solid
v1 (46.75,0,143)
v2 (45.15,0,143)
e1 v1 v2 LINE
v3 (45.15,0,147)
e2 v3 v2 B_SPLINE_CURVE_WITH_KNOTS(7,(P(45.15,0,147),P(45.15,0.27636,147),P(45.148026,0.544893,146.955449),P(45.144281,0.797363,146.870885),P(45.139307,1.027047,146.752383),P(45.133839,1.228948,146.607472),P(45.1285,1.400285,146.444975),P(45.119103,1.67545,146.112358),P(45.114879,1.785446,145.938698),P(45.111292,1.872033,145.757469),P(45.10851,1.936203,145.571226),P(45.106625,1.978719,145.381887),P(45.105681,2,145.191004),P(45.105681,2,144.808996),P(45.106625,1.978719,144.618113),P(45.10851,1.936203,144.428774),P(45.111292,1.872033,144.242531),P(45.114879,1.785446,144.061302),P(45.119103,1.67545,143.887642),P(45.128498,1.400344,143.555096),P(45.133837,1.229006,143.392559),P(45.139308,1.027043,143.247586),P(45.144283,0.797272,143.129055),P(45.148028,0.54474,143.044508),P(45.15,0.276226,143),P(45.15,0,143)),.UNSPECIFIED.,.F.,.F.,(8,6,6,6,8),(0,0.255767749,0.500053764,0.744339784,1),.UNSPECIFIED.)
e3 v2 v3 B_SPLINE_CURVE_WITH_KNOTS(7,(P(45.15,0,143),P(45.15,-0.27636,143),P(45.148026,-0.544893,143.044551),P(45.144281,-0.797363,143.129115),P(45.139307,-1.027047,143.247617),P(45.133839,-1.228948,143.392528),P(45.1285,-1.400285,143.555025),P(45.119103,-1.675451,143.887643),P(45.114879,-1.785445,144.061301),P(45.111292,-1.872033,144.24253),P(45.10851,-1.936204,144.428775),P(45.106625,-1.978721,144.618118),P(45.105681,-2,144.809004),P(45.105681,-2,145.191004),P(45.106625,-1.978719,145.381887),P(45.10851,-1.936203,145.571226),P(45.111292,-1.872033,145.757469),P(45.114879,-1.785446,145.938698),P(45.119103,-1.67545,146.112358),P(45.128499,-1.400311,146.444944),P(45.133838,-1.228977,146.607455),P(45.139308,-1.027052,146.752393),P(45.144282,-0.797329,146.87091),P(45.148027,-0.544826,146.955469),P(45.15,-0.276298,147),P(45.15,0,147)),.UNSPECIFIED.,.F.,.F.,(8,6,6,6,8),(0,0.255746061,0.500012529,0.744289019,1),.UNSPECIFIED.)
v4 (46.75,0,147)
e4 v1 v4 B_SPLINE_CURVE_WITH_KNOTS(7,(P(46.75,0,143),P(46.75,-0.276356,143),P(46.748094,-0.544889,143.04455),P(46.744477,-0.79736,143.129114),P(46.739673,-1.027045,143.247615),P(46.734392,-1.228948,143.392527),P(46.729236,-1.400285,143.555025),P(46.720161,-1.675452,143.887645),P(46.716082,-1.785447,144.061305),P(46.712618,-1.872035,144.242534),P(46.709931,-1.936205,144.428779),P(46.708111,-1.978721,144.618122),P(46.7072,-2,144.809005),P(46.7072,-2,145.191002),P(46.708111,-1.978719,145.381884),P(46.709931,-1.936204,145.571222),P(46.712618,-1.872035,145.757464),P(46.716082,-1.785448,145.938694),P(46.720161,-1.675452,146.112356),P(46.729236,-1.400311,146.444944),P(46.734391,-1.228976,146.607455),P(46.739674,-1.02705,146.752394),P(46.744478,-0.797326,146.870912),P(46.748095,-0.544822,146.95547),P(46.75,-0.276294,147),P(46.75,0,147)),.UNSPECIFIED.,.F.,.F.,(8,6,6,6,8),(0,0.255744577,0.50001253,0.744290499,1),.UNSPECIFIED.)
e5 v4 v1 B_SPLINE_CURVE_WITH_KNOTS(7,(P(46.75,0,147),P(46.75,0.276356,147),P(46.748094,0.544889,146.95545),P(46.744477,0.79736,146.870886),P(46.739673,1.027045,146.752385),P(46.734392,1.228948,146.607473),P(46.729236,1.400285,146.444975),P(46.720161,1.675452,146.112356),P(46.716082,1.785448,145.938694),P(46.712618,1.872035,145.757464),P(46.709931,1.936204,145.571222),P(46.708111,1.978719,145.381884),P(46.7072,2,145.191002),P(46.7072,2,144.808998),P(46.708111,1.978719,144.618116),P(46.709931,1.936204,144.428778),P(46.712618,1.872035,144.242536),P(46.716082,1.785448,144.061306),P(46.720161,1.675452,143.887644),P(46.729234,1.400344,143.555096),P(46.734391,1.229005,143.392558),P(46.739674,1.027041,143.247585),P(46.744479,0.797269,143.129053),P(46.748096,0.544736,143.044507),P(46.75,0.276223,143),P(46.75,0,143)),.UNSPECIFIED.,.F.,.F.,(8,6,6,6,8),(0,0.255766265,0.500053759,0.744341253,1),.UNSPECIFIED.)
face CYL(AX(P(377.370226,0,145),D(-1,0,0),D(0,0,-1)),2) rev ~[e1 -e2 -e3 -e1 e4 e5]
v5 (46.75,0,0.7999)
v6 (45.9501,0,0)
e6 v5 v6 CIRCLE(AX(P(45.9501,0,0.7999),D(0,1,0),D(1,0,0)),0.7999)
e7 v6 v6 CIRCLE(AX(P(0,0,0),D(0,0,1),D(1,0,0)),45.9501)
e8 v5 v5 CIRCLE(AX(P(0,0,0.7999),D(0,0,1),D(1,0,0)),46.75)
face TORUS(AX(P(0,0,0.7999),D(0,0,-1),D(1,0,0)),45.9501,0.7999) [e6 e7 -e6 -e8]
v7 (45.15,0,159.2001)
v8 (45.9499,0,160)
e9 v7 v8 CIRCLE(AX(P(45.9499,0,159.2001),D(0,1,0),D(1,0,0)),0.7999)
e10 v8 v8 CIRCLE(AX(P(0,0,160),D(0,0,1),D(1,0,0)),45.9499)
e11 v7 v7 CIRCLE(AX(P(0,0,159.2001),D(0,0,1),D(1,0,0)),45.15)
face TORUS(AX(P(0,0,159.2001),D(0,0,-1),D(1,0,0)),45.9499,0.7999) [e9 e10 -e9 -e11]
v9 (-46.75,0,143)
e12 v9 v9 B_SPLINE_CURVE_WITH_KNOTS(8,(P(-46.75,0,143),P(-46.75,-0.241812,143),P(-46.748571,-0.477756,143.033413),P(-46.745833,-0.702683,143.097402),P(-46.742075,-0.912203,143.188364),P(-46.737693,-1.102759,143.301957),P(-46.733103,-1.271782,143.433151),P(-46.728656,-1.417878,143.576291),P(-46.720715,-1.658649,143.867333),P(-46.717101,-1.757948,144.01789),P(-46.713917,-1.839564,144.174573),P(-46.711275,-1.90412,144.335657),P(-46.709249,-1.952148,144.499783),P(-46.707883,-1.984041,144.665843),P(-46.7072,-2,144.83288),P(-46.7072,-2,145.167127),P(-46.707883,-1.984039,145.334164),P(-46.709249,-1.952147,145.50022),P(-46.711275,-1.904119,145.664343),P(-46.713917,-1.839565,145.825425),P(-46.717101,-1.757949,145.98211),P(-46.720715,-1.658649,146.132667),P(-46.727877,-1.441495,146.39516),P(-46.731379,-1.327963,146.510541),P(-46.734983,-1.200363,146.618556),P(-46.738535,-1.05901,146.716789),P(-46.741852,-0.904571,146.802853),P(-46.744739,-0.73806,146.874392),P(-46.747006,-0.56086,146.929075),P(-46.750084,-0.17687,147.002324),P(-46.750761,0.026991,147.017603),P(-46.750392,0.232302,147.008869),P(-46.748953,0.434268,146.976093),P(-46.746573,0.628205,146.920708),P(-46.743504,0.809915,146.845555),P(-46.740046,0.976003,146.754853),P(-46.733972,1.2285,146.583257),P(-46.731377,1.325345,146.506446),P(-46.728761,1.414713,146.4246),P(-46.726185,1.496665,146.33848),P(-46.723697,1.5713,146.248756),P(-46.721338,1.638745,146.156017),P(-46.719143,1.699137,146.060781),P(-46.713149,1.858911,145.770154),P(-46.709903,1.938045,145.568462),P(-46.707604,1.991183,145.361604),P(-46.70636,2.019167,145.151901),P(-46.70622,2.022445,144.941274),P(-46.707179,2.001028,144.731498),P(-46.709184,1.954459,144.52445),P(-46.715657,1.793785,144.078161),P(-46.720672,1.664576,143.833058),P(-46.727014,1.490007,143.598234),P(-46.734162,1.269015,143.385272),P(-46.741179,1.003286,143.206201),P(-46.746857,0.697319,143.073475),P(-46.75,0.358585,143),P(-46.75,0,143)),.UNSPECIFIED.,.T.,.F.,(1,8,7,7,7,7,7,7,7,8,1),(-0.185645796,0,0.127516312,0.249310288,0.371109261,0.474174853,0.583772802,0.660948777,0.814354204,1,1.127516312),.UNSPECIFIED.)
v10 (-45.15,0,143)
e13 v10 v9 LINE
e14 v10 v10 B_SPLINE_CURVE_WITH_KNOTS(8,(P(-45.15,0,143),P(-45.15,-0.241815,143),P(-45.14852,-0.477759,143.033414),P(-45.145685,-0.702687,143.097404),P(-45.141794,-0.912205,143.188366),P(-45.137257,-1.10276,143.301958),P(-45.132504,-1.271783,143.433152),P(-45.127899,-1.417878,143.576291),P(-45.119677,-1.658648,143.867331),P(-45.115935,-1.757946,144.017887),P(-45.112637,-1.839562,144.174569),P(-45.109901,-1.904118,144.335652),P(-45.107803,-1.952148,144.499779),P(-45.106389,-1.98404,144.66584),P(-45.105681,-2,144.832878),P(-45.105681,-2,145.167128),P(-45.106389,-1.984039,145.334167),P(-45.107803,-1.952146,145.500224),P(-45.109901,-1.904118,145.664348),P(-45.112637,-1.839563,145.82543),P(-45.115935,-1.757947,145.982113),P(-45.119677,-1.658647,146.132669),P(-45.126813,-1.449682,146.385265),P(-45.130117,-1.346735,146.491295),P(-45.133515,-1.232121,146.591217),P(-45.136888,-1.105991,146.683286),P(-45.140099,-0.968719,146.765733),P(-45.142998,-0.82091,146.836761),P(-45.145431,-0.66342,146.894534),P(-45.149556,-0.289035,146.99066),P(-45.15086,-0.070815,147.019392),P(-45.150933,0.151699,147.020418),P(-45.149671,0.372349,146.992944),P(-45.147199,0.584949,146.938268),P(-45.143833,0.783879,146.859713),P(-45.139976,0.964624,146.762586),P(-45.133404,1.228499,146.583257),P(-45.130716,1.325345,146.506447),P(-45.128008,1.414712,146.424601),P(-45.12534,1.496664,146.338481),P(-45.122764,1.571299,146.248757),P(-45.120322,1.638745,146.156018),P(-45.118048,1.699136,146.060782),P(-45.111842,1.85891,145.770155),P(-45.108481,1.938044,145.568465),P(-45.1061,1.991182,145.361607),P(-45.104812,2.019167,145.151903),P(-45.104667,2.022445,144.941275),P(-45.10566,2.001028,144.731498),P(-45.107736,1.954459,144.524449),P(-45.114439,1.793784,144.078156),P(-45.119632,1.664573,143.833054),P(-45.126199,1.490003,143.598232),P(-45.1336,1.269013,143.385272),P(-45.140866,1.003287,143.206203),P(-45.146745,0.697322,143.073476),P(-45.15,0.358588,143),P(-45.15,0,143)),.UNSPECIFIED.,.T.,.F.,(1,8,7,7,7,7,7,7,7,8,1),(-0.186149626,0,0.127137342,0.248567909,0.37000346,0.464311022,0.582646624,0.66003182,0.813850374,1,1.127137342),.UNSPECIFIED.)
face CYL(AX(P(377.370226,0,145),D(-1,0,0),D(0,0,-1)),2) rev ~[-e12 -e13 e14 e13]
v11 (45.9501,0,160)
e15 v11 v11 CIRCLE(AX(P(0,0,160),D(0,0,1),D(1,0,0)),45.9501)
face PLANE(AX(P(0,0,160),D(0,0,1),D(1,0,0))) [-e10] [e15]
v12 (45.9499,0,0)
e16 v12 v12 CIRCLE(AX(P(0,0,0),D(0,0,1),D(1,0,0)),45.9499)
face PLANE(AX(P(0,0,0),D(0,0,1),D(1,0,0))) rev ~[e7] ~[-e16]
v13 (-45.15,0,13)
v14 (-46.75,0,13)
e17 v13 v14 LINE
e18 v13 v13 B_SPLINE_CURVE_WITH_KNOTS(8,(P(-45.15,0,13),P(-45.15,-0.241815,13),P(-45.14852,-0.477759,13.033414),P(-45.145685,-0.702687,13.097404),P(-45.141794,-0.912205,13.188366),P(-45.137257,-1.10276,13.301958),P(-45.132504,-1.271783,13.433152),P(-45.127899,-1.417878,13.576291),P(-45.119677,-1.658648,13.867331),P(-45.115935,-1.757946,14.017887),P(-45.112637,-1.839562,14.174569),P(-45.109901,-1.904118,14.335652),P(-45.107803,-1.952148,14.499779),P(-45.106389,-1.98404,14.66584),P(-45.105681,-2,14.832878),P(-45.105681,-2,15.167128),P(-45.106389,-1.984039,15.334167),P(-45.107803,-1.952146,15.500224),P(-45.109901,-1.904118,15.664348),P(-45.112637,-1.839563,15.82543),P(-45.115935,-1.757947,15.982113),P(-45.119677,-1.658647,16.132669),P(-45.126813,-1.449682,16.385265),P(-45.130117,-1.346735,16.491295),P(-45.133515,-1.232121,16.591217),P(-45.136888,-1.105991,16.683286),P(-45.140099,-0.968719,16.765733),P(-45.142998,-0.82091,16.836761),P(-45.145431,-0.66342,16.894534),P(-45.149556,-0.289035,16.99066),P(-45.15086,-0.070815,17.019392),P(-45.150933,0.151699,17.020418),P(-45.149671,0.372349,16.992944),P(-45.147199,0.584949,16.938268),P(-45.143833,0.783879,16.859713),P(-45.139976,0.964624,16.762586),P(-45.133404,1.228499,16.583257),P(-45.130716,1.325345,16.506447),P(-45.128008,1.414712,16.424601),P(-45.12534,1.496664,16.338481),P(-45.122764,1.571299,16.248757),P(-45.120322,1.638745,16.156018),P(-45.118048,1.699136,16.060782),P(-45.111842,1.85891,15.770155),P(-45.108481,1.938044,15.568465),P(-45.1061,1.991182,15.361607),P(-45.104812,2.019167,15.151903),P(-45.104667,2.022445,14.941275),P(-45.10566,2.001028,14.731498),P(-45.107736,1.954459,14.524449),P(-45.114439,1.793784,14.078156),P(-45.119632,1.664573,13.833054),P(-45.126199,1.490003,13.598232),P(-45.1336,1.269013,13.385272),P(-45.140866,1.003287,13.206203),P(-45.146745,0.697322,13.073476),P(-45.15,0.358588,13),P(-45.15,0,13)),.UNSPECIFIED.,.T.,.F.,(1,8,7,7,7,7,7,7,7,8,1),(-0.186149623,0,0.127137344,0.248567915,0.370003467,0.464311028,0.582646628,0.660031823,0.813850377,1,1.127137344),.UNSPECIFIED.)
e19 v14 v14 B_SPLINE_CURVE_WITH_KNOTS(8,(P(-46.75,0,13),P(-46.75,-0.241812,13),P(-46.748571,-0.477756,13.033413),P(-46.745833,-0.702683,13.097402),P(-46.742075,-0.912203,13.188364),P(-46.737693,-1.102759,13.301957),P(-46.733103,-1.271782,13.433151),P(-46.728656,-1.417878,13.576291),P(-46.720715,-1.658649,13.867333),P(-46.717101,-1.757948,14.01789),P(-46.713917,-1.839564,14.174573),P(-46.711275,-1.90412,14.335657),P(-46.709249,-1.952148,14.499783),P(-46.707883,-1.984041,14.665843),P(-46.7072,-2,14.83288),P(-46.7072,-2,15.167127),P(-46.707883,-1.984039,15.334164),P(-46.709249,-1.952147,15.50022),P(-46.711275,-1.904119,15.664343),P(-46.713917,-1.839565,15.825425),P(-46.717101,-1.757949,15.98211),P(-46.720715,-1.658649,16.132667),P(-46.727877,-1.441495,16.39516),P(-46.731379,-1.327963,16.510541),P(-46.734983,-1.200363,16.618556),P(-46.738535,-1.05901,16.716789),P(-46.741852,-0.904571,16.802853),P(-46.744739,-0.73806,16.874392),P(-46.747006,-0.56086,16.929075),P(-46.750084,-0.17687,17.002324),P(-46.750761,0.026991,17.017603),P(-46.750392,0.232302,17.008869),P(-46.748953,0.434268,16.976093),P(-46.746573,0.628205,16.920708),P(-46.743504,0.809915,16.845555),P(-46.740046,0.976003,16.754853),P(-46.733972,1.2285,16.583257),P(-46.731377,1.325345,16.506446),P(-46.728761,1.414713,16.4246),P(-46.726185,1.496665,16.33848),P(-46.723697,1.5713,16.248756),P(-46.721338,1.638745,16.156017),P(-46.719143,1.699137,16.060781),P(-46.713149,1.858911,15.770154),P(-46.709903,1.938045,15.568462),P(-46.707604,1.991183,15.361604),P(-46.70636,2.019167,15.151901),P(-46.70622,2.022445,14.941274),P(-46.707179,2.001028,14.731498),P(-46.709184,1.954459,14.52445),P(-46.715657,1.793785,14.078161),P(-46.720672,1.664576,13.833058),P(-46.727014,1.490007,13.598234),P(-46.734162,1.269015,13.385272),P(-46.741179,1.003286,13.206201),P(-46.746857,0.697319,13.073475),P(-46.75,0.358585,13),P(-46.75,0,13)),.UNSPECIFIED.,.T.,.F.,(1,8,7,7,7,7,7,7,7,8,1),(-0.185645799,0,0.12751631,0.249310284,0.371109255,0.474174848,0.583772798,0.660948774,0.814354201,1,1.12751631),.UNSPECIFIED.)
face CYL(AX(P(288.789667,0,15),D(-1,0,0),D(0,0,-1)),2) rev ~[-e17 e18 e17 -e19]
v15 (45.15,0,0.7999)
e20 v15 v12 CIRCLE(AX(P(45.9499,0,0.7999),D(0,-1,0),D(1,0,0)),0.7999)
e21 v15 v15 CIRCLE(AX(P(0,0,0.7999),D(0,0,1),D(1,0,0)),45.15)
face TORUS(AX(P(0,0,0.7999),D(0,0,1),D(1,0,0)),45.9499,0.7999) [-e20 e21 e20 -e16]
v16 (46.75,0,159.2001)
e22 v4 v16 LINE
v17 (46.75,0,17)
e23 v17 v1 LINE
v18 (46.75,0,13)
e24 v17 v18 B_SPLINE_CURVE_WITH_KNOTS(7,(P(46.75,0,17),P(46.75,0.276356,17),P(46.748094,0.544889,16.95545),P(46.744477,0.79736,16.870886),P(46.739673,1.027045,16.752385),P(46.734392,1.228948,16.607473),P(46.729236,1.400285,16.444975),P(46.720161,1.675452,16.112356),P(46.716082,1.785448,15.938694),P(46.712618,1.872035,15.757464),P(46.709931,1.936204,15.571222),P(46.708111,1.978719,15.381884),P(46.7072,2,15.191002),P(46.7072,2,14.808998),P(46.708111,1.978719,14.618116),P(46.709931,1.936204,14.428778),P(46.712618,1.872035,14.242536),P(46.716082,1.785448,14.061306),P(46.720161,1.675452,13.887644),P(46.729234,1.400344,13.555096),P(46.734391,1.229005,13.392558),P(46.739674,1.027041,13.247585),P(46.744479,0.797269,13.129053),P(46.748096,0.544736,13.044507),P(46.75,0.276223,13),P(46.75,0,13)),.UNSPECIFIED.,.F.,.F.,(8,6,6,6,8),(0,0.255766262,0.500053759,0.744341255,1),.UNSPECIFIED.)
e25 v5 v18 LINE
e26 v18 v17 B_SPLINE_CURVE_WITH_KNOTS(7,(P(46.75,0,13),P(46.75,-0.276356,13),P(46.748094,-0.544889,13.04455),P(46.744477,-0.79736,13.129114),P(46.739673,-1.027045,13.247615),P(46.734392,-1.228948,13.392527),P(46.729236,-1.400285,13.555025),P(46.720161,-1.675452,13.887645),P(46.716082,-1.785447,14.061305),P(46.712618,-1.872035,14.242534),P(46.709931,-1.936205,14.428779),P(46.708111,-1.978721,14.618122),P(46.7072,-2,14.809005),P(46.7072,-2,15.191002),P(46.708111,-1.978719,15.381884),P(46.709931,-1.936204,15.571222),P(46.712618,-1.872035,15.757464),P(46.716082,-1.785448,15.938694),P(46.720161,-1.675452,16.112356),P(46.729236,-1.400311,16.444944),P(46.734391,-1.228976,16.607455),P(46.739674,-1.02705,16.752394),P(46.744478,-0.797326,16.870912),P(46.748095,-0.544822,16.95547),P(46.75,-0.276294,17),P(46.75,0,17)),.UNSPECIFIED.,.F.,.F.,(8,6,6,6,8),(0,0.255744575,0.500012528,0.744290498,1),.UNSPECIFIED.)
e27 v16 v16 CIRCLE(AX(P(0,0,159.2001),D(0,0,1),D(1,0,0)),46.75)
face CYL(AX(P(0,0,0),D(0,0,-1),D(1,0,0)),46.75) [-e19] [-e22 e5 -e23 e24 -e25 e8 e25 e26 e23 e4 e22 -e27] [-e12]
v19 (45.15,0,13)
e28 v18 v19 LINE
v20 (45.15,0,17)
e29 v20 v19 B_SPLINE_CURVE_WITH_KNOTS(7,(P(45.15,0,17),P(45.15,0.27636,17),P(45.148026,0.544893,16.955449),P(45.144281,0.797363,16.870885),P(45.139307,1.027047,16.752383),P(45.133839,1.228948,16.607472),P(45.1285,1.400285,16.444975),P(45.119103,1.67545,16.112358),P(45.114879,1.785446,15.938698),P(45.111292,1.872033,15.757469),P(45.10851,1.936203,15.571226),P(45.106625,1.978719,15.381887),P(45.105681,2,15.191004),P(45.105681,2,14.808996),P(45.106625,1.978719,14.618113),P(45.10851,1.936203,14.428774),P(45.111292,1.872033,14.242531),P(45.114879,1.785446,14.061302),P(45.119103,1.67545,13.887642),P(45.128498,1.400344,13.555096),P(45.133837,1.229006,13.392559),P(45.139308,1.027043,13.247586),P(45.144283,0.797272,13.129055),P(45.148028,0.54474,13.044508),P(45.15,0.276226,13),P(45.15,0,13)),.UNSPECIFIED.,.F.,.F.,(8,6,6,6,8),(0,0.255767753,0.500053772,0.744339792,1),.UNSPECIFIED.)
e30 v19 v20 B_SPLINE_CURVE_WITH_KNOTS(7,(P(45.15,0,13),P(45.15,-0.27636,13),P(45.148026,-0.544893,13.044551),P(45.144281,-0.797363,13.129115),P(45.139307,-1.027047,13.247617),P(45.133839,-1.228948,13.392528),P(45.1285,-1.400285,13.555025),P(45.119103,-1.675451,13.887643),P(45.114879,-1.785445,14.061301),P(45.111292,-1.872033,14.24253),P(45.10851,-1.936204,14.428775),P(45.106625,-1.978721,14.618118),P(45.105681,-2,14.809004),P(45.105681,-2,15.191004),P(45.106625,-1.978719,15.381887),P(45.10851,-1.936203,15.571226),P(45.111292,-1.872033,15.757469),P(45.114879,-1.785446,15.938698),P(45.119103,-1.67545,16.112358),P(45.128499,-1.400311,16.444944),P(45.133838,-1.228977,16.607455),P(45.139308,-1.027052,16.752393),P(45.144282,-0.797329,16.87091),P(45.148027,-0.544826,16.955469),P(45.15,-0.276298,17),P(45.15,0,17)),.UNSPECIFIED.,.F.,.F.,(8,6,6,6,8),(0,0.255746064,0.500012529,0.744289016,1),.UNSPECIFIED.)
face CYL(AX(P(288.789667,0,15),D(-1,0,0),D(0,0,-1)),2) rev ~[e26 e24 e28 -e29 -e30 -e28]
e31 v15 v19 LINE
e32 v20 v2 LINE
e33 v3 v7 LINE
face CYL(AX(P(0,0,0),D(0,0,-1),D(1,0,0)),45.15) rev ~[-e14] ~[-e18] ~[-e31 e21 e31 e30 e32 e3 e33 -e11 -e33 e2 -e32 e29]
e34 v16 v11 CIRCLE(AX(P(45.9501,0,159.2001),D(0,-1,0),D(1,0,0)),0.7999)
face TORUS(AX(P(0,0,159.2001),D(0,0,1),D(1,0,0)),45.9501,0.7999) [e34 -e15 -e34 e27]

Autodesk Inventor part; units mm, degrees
ref_plane "XZ Plane" through (0, 0, 0) normal (0, 1, 0) x (-1, 0, 0)
ref_plane "XY Plane" through (0, 0, 0) normal (0, 0, 1) x (1, 0, 0)
sketch "Эскиз1" plane through (0, 0, 0) normal (0, 0, 1) x (1, 0, 0)
  circle A0 centre (0, 0) radius 45.15
  circle A1 centre (0, 0) radius 46.75
  dimension "d0" = 90.3
  dimension "d1" = 93.5
extrude "Выдавливание1" add sketch "Эскиз1" along normal blind 160
fillet "Сопряжение1" radius 0.8 4 edges at (-46.75, 0, 160) (-45.15, 0, 160) (-46.75, 0, 0) (-45.15, 0, 0)
sketch "Эскиз2" plane through (0, 0, 0) normal (1, 0, 0) x (0, 1, 0)
  circle A0 centre (0, 15) radius 2
  circle A1 centre (0, 145) radius 2
  point P0 (0, 0)
  dimension "d5" = 4
  dimension "d6" = 4
  dimension "d7" = 15
  dimension "d8" = 145
hole "Отверстие1" at (0, 0, 145) at (0, 0, 15) direction (-1, 0, 0) diameter 4 end through all both
equation "\"d0\" = dInternal"
equation "\"d1\" = dInternal + wallThickness"
equation "\"d2\" = tubeHeight"
equation "\"d4\" = 0.25 * wallThickness"
equation "\"d5\" = dHole"
equation "\"d6\" = dHole"
equation "\"d7\" = distanceHoles"
equation "\"d8\" = tubeHeight - distanceHoles"
equation "\"d9\" = dHole"
equation "\"dInternal\" = 90.3"
equation "\"wallThickness\" = 3.2"
equation "\"tubeHeight\" = 160"
equation "\"dHole\" = 4"
equation "\"distanceHoles\" = 15"
properties part number "EimarTube"
